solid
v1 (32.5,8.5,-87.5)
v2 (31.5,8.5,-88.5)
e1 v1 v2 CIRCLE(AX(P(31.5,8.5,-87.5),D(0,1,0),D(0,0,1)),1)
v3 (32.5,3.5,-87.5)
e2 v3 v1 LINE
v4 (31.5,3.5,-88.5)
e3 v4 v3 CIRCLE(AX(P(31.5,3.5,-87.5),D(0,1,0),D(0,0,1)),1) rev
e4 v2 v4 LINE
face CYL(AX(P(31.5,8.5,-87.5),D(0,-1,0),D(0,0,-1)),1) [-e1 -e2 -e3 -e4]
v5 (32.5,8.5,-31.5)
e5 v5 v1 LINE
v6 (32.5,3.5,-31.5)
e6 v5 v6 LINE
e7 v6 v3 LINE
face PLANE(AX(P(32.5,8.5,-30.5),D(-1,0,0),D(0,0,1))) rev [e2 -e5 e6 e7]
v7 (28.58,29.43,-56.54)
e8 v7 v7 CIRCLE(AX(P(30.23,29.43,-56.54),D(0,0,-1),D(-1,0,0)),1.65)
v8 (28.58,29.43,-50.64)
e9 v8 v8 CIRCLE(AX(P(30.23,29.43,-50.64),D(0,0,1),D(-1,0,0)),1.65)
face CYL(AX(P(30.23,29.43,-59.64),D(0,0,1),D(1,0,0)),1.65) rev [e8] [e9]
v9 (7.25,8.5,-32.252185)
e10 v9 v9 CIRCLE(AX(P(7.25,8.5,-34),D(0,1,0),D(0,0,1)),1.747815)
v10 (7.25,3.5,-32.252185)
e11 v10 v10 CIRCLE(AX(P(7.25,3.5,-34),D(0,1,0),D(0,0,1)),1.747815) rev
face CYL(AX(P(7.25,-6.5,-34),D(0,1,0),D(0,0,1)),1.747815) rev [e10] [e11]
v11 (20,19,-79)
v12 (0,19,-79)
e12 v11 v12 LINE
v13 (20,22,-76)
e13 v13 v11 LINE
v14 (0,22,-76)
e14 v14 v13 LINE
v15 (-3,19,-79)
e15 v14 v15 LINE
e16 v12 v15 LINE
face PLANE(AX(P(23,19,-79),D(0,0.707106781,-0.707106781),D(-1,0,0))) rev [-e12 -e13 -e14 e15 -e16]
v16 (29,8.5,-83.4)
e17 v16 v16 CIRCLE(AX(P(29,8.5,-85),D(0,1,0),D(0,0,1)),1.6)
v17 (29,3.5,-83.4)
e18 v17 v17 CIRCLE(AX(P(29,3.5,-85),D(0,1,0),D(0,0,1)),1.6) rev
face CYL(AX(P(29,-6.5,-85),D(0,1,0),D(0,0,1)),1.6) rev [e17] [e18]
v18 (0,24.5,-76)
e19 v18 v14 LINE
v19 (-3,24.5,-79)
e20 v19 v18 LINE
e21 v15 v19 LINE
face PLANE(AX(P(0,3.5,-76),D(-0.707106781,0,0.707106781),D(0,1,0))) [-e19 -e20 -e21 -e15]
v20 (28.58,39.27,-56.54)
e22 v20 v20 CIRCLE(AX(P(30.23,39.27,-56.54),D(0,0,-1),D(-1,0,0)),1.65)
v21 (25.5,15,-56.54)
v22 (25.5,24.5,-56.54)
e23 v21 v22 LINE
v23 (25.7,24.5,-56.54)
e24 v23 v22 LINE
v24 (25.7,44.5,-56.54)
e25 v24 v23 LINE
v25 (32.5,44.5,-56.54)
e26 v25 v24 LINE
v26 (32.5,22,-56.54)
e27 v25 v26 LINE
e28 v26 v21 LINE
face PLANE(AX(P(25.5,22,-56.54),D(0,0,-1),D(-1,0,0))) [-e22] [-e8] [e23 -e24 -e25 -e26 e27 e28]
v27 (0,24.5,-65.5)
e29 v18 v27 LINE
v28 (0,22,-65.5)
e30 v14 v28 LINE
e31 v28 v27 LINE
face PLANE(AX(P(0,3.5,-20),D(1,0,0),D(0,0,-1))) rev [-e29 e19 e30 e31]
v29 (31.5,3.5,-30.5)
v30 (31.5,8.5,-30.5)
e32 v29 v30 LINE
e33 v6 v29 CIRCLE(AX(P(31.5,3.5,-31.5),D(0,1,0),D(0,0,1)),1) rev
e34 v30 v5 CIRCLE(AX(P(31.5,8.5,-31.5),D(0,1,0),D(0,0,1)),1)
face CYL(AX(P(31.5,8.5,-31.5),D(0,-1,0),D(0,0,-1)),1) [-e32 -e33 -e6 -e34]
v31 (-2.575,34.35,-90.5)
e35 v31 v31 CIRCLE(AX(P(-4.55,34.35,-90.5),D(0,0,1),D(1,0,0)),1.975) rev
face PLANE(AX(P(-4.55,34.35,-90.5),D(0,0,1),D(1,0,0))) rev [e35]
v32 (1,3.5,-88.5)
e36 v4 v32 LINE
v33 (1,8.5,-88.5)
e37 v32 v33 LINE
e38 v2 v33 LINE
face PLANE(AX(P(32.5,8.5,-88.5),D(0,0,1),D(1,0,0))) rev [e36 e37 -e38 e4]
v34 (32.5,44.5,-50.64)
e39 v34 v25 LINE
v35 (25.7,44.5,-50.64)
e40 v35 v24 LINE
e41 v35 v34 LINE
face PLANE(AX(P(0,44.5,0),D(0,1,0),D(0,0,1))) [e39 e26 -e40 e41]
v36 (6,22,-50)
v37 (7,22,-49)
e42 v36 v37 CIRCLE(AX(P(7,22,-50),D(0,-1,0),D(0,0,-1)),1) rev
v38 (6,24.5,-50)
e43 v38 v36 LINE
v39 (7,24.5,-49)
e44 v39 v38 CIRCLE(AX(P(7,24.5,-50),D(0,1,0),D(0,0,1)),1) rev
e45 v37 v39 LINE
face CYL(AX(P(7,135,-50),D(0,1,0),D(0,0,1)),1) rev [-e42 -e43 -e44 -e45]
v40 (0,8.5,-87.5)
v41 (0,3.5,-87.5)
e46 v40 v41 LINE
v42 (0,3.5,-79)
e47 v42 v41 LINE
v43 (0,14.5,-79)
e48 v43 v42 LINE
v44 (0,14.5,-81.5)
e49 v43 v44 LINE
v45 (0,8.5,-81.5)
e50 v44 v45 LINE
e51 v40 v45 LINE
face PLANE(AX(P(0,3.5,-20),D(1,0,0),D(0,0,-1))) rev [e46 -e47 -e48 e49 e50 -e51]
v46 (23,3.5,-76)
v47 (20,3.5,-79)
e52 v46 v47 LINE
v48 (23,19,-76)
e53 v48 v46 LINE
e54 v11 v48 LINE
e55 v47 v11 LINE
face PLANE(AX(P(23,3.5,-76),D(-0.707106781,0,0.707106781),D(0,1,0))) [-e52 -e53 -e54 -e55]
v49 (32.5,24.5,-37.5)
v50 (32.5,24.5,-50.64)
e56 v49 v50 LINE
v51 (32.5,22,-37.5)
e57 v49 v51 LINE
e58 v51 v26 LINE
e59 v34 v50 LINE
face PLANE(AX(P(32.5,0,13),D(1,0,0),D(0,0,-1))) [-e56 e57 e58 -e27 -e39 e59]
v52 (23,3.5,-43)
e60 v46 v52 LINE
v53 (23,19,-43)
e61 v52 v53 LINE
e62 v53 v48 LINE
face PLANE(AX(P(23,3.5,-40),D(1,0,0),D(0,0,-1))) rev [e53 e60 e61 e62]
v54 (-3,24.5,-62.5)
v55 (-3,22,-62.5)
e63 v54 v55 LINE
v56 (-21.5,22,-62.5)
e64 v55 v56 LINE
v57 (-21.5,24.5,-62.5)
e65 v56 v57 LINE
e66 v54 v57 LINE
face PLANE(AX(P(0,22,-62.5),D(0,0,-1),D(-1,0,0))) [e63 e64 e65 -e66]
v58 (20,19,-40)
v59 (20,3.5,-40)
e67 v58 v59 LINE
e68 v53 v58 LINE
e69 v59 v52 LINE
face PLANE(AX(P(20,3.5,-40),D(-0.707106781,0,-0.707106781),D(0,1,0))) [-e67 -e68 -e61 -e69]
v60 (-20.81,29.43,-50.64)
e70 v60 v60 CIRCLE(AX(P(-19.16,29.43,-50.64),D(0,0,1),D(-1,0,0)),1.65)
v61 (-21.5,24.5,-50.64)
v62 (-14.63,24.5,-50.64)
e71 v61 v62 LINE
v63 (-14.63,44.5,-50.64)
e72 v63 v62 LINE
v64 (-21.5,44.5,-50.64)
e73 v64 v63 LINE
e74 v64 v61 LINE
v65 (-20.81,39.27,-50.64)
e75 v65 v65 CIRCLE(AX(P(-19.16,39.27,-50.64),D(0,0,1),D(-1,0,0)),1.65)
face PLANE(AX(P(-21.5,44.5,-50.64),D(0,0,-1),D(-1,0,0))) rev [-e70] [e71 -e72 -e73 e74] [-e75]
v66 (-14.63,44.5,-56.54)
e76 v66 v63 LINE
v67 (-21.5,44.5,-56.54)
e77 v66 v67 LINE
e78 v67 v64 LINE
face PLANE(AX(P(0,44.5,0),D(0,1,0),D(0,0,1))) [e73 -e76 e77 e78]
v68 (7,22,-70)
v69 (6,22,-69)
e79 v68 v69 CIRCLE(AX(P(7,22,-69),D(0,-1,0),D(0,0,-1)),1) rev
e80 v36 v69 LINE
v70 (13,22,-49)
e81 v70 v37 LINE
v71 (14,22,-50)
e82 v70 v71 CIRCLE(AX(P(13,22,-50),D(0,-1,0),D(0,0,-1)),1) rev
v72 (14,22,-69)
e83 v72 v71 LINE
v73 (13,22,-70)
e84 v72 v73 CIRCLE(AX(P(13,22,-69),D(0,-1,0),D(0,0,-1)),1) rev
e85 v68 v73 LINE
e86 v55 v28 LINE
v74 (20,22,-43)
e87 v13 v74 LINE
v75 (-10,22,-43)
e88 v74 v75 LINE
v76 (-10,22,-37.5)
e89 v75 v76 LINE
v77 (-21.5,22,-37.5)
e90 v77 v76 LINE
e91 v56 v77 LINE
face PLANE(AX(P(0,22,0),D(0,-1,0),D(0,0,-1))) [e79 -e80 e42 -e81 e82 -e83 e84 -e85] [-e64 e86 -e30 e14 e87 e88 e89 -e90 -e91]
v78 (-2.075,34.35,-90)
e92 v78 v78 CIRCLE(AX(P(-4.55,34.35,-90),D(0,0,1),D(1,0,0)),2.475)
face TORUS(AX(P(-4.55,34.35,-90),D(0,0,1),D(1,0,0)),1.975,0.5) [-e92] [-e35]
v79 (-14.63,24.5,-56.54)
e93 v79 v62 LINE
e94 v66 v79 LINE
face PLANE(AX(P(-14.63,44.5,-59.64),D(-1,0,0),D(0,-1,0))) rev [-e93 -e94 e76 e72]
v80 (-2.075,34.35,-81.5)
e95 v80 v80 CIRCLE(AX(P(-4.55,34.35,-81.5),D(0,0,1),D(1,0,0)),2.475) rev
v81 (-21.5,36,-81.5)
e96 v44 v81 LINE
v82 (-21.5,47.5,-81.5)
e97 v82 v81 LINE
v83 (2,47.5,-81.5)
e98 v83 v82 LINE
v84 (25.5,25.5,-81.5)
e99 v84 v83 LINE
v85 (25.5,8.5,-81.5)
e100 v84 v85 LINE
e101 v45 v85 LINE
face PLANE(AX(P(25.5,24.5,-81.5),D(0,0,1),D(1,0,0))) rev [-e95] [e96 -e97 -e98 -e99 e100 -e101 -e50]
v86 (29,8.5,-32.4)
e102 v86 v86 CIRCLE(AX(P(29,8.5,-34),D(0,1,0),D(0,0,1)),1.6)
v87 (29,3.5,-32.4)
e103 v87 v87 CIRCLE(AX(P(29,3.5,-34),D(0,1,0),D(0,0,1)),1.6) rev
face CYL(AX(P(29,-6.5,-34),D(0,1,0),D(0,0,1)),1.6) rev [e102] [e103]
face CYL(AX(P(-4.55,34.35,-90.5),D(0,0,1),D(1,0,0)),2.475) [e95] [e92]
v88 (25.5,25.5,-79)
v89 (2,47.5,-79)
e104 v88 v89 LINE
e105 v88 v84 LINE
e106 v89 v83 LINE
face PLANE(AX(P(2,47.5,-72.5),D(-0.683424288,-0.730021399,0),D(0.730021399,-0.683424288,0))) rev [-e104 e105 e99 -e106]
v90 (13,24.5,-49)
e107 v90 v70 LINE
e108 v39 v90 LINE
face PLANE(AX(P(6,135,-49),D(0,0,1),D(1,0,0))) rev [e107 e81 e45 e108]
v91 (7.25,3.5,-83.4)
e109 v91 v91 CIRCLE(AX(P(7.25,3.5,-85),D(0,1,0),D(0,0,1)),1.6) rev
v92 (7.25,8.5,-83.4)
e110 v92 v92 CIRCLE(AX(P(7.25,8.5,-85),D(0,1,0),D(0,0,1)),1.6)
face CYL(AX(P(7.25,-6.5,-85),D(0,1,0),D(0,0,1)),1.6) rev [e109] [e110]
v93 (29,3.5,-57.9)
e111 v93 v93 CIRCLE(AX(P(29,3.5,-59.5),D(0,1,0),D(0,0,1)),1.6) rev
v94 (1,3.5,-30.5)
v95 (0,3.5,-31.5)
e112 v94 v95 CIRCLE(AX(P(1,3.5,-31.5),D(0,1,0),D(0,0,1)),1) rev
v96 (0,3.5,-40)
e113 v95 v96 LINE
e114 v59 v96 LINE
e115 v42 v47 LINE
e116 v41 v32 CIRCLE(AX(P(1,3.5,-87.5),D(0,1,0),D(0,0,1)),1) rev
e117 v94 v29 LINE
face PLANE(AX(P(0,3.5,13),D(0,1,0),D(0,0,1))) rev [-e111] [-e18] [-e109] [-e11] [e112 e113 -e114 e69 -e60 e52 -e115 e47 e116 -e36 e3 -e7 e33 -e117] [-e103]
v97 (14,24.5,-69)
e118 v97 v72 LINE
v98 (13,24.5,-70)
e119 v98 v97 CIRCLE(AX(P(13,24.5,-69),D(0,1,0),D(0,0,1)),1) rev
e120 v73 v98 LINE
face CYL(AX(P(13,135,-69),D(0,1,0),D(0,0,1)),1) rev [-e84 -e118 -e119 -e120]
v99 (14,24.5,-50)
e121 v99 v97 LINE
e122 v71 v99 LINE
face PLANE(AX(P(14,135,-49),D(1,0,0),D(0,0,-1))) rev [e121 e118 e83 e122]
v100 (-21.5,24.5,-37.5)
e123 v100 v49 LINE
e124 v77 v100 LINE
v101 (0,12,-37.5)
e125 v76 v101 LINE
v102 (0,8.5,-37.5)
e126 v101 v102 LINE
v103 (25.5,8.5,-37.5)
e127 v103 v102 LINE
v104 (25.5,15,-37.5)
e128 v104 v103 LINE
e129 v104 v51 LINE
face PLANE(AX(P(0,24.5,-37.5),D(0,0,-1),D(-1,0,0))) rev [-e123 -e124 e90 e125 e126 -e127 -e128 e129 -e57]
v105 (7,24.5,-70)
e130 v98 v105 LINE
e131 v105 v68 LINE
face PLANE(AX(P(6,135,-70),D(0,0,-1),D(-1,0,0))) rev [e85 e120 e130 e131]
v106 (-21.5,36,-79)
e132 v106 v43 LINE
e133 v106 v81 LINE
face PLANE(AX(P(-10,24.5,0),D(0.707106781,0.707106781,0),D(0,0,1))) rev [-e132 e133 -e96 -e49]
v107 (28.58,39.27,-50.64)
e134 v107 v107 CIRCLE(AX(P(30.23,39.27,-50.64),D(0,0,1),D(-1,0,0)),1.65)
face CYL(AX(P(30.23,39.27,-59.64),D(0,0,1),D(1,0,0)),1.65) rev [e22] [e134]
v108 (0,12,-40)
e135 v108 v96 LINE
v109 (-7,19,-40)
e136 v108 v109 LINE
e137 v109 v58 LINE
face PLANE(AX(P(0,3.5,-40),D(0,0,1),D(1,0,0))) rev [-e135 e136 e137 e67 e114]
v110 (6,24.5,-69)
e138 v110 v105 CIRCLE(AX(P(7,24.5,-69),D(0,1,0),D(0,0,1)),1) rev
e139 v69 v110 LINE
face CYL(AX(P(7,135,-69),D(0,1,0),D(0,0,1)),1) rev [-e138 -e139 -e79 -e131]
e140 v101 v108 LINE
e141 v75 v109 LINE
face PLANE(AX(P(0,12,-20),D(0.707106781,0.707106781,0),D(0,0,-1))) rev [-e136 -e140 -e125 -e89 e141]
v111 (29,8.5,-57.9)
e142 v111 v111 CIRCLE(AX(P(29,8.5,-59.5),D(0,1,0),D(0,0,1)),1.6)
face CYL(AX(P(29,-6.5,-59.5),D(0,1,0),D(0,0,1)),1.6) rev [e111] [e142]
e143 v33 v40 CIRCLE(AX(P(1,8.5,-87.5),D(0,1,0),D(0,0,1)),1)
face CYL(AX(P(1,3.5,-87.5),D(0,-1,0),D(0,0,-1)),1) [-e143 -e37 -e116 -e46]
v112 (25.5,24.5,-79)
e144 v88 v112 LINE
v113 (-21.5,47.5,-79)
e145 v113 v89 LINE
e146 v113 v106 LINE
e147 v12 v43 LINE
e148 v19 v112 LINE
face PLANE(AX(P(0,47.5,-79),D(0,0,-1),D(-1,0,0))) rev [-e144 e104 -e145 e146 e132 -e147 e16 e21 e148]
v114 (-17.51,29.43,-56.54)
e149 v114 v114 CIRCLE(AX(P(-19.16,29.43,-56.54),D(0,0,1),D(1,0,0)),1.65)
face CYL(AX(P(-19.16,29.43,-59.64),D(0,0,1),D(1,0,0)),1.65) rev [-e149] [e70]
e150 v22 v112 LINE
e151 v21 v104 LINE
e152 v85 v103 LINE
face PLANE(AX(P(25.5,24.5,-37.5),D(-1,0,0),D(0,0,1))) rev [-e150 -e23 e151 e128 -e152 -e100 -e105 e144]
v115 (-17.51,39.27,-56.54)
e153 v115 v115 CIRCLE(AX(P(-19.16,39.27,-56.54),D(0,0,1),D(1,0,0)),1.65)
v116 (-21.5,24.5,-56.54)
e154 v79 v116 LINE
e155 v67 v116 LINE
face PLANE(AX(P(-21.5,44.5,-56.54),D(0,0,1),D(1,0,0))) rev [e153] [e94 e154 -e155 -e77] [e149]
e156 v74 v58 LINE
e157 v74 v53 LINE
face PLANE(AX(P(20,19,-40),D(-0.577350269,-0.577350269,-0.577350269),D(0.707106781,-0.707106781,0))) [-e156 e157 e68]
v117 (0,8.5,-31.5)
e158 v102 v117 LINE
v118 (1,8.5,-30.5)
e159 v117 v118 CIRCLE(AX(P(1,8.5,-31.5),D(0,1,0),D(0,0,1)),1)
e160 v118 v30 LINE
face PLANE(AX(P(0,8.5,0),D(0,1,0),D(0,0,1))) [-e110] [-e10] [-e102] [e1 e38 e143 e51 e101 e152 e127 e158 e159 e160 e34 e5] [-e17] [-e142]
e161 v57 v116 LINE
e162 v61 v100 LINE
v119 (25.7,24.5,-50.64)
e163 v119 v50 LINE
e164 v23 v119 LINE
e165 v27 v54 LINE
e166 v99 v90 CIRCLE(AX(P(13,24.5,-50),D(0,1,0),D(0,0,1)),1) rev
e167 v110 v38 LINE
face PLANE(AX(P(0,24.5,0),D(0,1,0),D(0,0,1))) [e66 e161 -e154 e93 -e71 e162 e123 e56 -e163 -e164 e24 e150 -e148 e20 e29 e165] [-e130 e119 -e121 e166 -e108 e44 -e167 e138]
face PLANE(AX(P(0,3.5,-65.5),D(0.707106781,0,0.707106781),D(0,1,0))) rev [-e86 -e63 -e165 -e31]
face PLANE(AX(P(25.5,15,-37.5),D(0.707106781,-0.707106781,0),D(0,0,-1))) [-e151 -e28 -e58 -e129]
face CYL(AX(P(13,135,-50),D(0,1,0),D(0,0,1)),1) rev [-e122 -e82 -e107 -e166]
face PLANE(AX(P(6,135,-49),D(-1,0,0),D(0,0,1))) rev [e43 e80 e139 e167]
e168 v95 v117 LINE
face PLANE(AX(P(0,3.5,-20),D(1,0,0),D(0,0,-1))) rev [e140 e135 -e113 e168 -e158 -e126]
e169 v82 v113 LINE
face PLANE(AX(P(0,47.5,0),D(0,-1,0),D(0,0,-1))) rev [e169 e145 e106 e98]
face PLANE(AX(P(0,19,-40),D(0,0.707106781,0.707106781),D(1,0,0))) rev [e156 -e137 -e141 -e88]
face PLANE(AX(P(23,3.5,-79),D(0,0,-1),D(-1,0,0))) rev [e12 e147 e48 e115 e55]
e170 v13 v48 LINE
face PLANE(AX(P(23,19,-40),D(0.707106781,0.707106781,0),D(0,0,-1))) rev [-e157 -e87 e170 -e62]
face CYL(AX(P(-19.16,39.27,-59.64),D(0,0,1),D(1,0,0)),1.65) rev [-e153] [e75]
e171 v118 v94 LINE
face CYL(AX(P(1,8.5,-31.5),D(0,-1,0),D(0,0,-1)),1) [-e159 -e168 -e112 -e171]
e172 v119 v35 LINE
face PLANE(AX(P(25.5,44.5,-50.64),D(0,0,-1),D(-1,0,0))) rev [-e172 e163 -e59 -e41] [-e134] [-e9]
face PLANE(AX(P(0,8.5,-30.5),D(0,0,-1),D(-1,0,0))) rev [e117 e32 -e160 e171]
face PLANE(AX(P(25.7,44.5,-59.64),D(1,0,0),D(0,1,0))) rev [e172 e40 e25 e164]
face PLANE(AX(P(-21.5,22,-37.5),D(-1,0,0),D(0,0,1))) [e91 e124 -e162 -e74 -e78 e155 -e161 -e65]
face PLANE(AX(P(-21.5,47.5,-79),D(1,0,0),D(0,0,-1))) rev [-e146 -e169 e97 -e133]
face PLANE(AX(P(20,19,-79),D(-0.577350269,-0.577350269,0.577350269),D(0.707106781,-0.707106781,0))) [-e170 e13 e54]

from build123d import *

# Parameters (mm, degrees)
BOSS_EXTRUDE1_DEPTH = 3.5
BOSS_EXTRUDE2_DEPTH = 21
SKETCH3_W           = 23
SKETCH3_H           = 39
BOSS_EXTRUDE3_DEPTH = 2.5
SKETCH5_W           = 21.5
SKETCH5_H           = 25
SKETCH5_W_2         = 7.07
SKETCH5_H_2         = 19.04
BOSS_EXTRUDE5_DEPTH = 2.5
SKETCH6_W           = 7.07
SKETCH6_H           = 5.9
BOSS_EXTRUDE6_DEPTH = 20
BOSS_EXTRUDE7_DEPTH = 23
FILLET1_SIZE        = 10
SKETCH9_R           = 2.475
BOSS_EXTRUDE8_DEPTH = 9
FILLET2_R           = 0.5
SKETCH10_R          = 1.65
CUT_EXTRUDE1_DEPTH  = 9
SKETCH11_W          = 0.2
SKETCH11_H          = 20
CUT_EXTRUDE2_DEPTH  = 9
CUT_EXTRUDE3_DEPTH  = 9
FILLET3_SIZE        = 3
BOSS_EXTRUDE9_DEPTH = 5
SKETCH14_R          = 1.747814763
SKETCH14_R_2        = 1.6
CUT_EXTRUDE4_DEPTH  = 15
CUT_EXTRUDE5_DEPTH  = 113
FILLET4_SIZE        = 7
FILLET5_SIZE        = 3
FILLET6_SIZE        = 3
FILLET7_R           = 1
SKETCH16_W          = 8
SKETCH16_H          = 21
CUT_EXTRUDE6_DEPTH  = 113
FILLET8_R           = 1


# Some blends are built 0.0001 mm under size
with BuildPart() as part:
    # Sketch1 → Boss-Extrude1 (new body)
    with BuildSketch(Plane(origin=(0, 0, 0), x_dir=(1, 0, 0), z_dir=(0, 1, 0))):
        Polygon((0, 40), (23, 40), (23, 79), (0, 79), (0, 100), (110, 100), (110, 79), (87, 79), (87, 40), (110, 40), (110, 20), (80, 0), (30, 0), (0, 20), align=None)
    extrude(amount=BOSS_EXTRUDE1_DEPTH)

    # Sketch2 → Boss-Extrude2 (add)
    with BuildSketch(Plane(origin=(0, 3.5, 0), x_dir=(1, 0, 0), z_dir=(0, 1, 0))):
        Polygon((0, 79), (23, 79), (23, 40), (0, 40), (0, 37.5), (25.5, 37.5), (25.5, 81.5), (0, 81.5), align=None)
        Polygon((110, 81.5), (84.5, 81.5), (84.5, 37.5), (110, 37.5), (110, 40), (87, 40), (87, 79), (110, 79), align=None)
    extrude(amount=BOSS_EXTRUDE2_DEPTH)

    # Sketch3 → Boss-Extrude3 (add)
    with BuildSketch(Plane(origin=(0, 24.5, 0), x_dir=(1, 0, 0), z_dir=(0, 1, 0))):
        with Locations((11.5, 59.5)):
            Rectangle(SKETCH3_W, SKETCH3_H)
        with Locations((98.5, 59.5)):
            Rectangle(SKETCH3_W, SKETCH3_H)
    extrude(amount=-BOSS_EXTRUDE3_DEPTH)

    # Sketch5 → Boss-Extrude5 (add)
    with BuildSketch(Plane(origin=(0, 24.5, 0), x_dir=(1, 0, 0), z_dir=(0, 1, 0))):
        with Locations((120.75, 50)):
            Rectangle(SKETCH5_W, SKETCH5_H)
        with Locations((-10.75, 50)):
            Rectangle(SKETCH5_W, SKETCH5_H)
        with Locations((29.035, 47.02)):
            Rectangle(SKETCH5_W_2, SKETCH5_H_2)
        with Locations((80.965, 47.02)):
            Rectangle(SKETCH5_W_2, SKETCH5_H_2)
    extrude(amount=-BOSS_EXTRUDE5_DEPTH)

    # Sketch6 → Boss-Extrude6 (add)
    with BuildSketch(Plane(origin=(0, 24.5, 0), x_dir=(1, 0, 0), z_dir=(0, 1, 0))):
        with Locations((29.035, 53.59)):
            Rectangle(SKETCH6_W, SKETCH6_H)
        with Locations((80.965, 53.59)):
            Rectangle(SKETCH6_W, SKETCH6_H)
        with Locations((-17.965, 53.59)):
            Rectangle(SKETCH6_W, SKETCH6_H)
        with Locations((127.965, 53.59)):
            Rectangle(SKETCH6_W, SKETCH6_H)
    extrude(amount=BOSS_EXTRUDE6_DEPTH)

    # Sketch7 → Boss-Extrude7 (add)
    with BuildSketch(Plane(origin=(0, 24.5, 0), x_dir=(1, 0, 0), z_dir=(0, 1, 0))):
        Polygon((0, 81.5), (25.5, 81.5), (25.5, 79), (0, 79), (-21.5, 79), (-21.5, 81.5), align=None)
        Polygon((110, 79), (84.5, 79), (84.5, 81.5), (110, 81.5), (131.5, 81.5), (131.5, 79), align=None)
    extrude(amount=BOSS_EXTRUDE7_DEPTH)

    # Fillet1
    # the kernel refuses this chamfer: 10 mm, written as the material it adds along each edge
    with BuildSketch(Plane(origin=(0, 22, -40), x_dir=(0.027495876610586372, -0.9996219169112968, 0), z_dir=(0, 0, 1)), Plane(origin=(110, 22, -37.5), x_dir=(-0.027495876610586317, -0.9996219169112968, 0), z_dir=(0, 0, -1)), Plane(origin=(110, 24.5, -81.5), x_dir=(0.9996219169112968, 0.027495876610586317, 0), z_dir=(0, 0, 1))) as fillet1_piece_1:
        Polygon((FILLET1_SIZE * 0.999621916911, -FILLET1_SIZE * 0.0274958766106), (-FILLET1_SIZE * 0.0274958766106, -FILLET1_SIZE * 0.999621916911), (0, 0), align=None)
    extrude(amount=2.5)
    with BuildSketch(Plane(origin=(0, 24.5, -79), x_dir=(0.027495876610586372, -0.9996219169112968, 0), z_dir=(0, 0, -1))) as fillet1_piece_2:
        Polygon((FILLET1_SIZE * 0.999621916911, FILLET1_SIZE * 0.0274958766106), (-FILLET1_SIZE * 0.0274958766106, FILLET1_SIZE * 0.999621916911), (0, 0), align=None)
    extrude(amount=2.5)

    # Sketch9 → Boss-Extrude8 (add)
    with BuildSketch(Plane(origin=(0, 0, -81.5), x_dir=(-1, 0, 0), z_dir=(0, 0, -1))):
        with Locations(Location((-114.55, 34.35, 0), (0, 0, 180))):
            Circle(SKETCH9_R)
        with Locations(Location((4.55, 34.35, 0), (0, 0, 180))):
            Circle(SKETCH9_R)
    extrude(amount=BOSS_EXTRUDE8_DEPTH)

    # Fillet2
    fillet2_edges = [part.edges().sort_by_distance(p)[0] for p in [
        (112.075, 34.35, -90.5),
        (-7.025, 34.35, -90.5),
    ]]
    fillet(fillet2_edges, radius=FILLET2_R)

    # Sketch10 → Cut-Extrude1 (cut)
    with BuildSketch(Plane.XY.offset(-50.64)):
        with Locations((129.16, 39.27)):
            Circle(SKETCH10_R)
        with Locations((129.16, 29.43)):
            Circle(SKETCH10_R)
        with Locations((79.77, 39.27)):
            Circle(SKETCH10_R)
        with Locations((79.77, 29.43)):
            Circle(SKETCH10_R)
        with Locations((-19.16, 29.43)):
            Circle(SKETCH10_R)
        with Locations((-19.16, 39.27)):
            Circle(SKETCH10_R)
        with Locations(Location((30.23, 39.27, 0), (0, 0, 180))):
            Circle(SKETCH10_R)
        with Locations(Location((30.23, 29.43, 0), (0, 0, 180))):
            Circle(SKETCH10_R)
    extrude(amount=-CUT_EXTRUDE1_DEPTH, mode=Mode.SUBTRACT)

    # Sketch11 → Cut-Extrude2 (cut)
    with BuildSketch(Plane.XY.offset(-50.64)):
        with Locations((-14.53, 34.5)):
            Rectangle(SKETCH11_W, SKETCH11_H)
        with Locations((25.6, 34.5)):
            Rectangle(SKETCH11_W, SKETCH11_H)
        with Locations((84.4, 34.5)):
            Rectangle(SKETCH11_W, SKETCH11_H)
        with Locations((124.53, 34.5)):
            Rectangle(SKETCH11_W, SKETCH11_H)
    extrude(amount=-CUT_EXTRUDE2_DEPTH, mode=Mode.SUBTRACT)

    # Sketch12 → Cut-Extrude3 (cut)
    with BuildSketch(Plane(origin=(0, 0, -81.5), x_dir=(-1, 0, 0), z_dir=(0, 0, -1))):
        Polygon((-108, 47.5), (-84.5, 25.5), (-84.5, 47.5), align=None)
        Polygon((-25.5, 25.5), (-25.5, 47.5), (-2, 47.5), align=None)
        Polygon((-120, 24.5), (-131.5, 36), (-131.5, 24.5), align=None)
        Polygon((10, 24.5), (21.5, 36), (21.5, 24.5), align=None)
    extrude(amount=-CUT_EXTRUDE3_DEPTH, mode=Mode.SUBTRACT)

    # Fillet3
    fillet3_edges = [part.edges().sort_by_distance(p)[0] for p in [
        (0, 23.25, -62.5),
        (110, 23.25, -62.5),
    ]]
    chamfer(fillet3_edges, length=FILLET3_SIZE)

    # Sketch13 → Boss-Extrude9 (add)
    with BuildSketch(Plane(origin=(0, 3.5, 0), x_dir=(1, 0, 0), z_dir=(0, 1, 0))):
        Polygon((0, 30.5), (32.5, 30.5), (32.5, 88.5), (0, 88.5), (0, 81.5), (25.5, 81.5), (25.5, 37.5), (0, 37.5), align=None)
        Polygon((84.5, 37.5), (110, 37.5), (110, 30.5), (77.5, 30.5), (77.5, 88.5), (110, 88.5), (110, 81.5), (84.5, 81.5), align=None)
    extrude(amount=BOSS_EXTRUDE9_DEPTH)

    # Sketch14 → Cut-Extrude4 (cut)
    with BuildSketch(Plane(origin=(0, 8.5, 0), x_dir=(1, 0, 0), z_dir=(0, 1, 0))):
        with Locations(Location((7.25, 34, 0), (0, 0, 270))):
            Circle(SKETCH14_R)
        with Locations(Location((7.25, 85, 0), (0, 0, 270))):
            Circle(SKETCH14_R_2)
        with Locations(Location((29, 34, 0), (0, 0, 270))):
            Circle(SKETCH14_R_2)
        with Locations(Location((29, 59.5, 0), (0, 0, 270))):
            Circle(SKETCH14_R_2)
        with Locations(Location((29, 85, 0), (0, 0, 270))):
            Circle(SKETCH14_R_2)
        with Locations(Location((81, 34, 0), (0, 0, 90))):
            Circle(SKETCH14_R_2)
        with Locations(Location((102.75, 34, 0), (0, 0, 90))):
            Circle(SKETCH14_R)
        with Locations(Location((81, 59.5, 0), (0, 0, 90))):
            Circle(SKETCH14_R_2)
        with Locations(Location((81, 85, 0), (0, 0, 90))):
            Circle(SKETCH14_R_2)
        with Locations(Location((102.75, 85, 0), (0, 0, 90))):
            Circle(SKETCH14_R_2)
    extrude(amount=-CUT_EXTRUDE4_DEPTH, mode=Mode.SUBTRACT)

    # Sketch15 → Cut-Extrude5 (cut)
    with BuildSketch(Plane(origin=(0, 0, -100), x_dir=(-1, 0, 0), z_dir=(0, 0, -1))):
        Polygon((-110, 3.5), (-32.5, 3.5), (-32.5, 47.5), (-131.5, 47.5), (-131.5, 3.5), align=None)
        Polygon((0, 0), (0, 3.5), (-32.5, 3.5), (-110, 3.5), (-110, 0), align=None)
    extrude(amount=-CUT_EXTRUDE5_DEPTH, mode=Mode.SUBTRACT)

    # Fillet4
    fillet4_edges = [part.edges().sort_by_distance(p)[0] for p in [
        (25.5, 22, -47.02),
    ]]
    chamfer(fillet4_edges, length=FILLET4_SIZE - 0.0001)  # a hair under: the kernel refuses the full size

    # Fillet5
    fillet5_edges = [part.edges().sort_by_distance(p)[0] for p in [
        (23, 12.75, -40),
        (23, 12.75, -79),
        (23, 22, -59.5),
        (6.5, 22, -40),
        (11.5, 22, -79),
    ]]
    chamfer(fillet5_edges, length=FILLET5_SIZE)

    # Fillet6
    fillet6_edges = [part.edges().sort_by_distance(p)[0] for p in [
        (0, 21.75, -79),
    ]]
    chamfer(fillet6_edges, length=FILLET6_SIZE)

    # Fillet7
    fillet7_edges = [part.edges().sort_by_distance(p)[0] for p in [
        (0, 6, -30.5),
        (32.5, 6, -30.5),
        (32.5, 6, -88.5),
        (0, 6, -88.5),
    ]]
    fillet(fillet7_edges, radius=FILLET7_R)

    # Sketch16 → Cut-Extrude6 (cut)
    with BuildSketch(Plane.XZ.offset(-22)):
        with Locations((10, -59.5)):
            Rectangle(SKETCH16_W, SKETCH16_H)
    extrude(amount=-CUT_EXTRUDE6_DEPTH, mode=Mode.SUBTRACT)

    # Fillet8
    fillet8_edges = [part.edges().sort_by_distance(p)[0] for p in [
        (6, 23.25, -70),
        (6, 23.25, -49),
        (14, 23.25, -49),
        (14, 23.25, -70),
    ]]
    fillet(fillet8_edges, radius=FILLET8_R)


solid = part.part
